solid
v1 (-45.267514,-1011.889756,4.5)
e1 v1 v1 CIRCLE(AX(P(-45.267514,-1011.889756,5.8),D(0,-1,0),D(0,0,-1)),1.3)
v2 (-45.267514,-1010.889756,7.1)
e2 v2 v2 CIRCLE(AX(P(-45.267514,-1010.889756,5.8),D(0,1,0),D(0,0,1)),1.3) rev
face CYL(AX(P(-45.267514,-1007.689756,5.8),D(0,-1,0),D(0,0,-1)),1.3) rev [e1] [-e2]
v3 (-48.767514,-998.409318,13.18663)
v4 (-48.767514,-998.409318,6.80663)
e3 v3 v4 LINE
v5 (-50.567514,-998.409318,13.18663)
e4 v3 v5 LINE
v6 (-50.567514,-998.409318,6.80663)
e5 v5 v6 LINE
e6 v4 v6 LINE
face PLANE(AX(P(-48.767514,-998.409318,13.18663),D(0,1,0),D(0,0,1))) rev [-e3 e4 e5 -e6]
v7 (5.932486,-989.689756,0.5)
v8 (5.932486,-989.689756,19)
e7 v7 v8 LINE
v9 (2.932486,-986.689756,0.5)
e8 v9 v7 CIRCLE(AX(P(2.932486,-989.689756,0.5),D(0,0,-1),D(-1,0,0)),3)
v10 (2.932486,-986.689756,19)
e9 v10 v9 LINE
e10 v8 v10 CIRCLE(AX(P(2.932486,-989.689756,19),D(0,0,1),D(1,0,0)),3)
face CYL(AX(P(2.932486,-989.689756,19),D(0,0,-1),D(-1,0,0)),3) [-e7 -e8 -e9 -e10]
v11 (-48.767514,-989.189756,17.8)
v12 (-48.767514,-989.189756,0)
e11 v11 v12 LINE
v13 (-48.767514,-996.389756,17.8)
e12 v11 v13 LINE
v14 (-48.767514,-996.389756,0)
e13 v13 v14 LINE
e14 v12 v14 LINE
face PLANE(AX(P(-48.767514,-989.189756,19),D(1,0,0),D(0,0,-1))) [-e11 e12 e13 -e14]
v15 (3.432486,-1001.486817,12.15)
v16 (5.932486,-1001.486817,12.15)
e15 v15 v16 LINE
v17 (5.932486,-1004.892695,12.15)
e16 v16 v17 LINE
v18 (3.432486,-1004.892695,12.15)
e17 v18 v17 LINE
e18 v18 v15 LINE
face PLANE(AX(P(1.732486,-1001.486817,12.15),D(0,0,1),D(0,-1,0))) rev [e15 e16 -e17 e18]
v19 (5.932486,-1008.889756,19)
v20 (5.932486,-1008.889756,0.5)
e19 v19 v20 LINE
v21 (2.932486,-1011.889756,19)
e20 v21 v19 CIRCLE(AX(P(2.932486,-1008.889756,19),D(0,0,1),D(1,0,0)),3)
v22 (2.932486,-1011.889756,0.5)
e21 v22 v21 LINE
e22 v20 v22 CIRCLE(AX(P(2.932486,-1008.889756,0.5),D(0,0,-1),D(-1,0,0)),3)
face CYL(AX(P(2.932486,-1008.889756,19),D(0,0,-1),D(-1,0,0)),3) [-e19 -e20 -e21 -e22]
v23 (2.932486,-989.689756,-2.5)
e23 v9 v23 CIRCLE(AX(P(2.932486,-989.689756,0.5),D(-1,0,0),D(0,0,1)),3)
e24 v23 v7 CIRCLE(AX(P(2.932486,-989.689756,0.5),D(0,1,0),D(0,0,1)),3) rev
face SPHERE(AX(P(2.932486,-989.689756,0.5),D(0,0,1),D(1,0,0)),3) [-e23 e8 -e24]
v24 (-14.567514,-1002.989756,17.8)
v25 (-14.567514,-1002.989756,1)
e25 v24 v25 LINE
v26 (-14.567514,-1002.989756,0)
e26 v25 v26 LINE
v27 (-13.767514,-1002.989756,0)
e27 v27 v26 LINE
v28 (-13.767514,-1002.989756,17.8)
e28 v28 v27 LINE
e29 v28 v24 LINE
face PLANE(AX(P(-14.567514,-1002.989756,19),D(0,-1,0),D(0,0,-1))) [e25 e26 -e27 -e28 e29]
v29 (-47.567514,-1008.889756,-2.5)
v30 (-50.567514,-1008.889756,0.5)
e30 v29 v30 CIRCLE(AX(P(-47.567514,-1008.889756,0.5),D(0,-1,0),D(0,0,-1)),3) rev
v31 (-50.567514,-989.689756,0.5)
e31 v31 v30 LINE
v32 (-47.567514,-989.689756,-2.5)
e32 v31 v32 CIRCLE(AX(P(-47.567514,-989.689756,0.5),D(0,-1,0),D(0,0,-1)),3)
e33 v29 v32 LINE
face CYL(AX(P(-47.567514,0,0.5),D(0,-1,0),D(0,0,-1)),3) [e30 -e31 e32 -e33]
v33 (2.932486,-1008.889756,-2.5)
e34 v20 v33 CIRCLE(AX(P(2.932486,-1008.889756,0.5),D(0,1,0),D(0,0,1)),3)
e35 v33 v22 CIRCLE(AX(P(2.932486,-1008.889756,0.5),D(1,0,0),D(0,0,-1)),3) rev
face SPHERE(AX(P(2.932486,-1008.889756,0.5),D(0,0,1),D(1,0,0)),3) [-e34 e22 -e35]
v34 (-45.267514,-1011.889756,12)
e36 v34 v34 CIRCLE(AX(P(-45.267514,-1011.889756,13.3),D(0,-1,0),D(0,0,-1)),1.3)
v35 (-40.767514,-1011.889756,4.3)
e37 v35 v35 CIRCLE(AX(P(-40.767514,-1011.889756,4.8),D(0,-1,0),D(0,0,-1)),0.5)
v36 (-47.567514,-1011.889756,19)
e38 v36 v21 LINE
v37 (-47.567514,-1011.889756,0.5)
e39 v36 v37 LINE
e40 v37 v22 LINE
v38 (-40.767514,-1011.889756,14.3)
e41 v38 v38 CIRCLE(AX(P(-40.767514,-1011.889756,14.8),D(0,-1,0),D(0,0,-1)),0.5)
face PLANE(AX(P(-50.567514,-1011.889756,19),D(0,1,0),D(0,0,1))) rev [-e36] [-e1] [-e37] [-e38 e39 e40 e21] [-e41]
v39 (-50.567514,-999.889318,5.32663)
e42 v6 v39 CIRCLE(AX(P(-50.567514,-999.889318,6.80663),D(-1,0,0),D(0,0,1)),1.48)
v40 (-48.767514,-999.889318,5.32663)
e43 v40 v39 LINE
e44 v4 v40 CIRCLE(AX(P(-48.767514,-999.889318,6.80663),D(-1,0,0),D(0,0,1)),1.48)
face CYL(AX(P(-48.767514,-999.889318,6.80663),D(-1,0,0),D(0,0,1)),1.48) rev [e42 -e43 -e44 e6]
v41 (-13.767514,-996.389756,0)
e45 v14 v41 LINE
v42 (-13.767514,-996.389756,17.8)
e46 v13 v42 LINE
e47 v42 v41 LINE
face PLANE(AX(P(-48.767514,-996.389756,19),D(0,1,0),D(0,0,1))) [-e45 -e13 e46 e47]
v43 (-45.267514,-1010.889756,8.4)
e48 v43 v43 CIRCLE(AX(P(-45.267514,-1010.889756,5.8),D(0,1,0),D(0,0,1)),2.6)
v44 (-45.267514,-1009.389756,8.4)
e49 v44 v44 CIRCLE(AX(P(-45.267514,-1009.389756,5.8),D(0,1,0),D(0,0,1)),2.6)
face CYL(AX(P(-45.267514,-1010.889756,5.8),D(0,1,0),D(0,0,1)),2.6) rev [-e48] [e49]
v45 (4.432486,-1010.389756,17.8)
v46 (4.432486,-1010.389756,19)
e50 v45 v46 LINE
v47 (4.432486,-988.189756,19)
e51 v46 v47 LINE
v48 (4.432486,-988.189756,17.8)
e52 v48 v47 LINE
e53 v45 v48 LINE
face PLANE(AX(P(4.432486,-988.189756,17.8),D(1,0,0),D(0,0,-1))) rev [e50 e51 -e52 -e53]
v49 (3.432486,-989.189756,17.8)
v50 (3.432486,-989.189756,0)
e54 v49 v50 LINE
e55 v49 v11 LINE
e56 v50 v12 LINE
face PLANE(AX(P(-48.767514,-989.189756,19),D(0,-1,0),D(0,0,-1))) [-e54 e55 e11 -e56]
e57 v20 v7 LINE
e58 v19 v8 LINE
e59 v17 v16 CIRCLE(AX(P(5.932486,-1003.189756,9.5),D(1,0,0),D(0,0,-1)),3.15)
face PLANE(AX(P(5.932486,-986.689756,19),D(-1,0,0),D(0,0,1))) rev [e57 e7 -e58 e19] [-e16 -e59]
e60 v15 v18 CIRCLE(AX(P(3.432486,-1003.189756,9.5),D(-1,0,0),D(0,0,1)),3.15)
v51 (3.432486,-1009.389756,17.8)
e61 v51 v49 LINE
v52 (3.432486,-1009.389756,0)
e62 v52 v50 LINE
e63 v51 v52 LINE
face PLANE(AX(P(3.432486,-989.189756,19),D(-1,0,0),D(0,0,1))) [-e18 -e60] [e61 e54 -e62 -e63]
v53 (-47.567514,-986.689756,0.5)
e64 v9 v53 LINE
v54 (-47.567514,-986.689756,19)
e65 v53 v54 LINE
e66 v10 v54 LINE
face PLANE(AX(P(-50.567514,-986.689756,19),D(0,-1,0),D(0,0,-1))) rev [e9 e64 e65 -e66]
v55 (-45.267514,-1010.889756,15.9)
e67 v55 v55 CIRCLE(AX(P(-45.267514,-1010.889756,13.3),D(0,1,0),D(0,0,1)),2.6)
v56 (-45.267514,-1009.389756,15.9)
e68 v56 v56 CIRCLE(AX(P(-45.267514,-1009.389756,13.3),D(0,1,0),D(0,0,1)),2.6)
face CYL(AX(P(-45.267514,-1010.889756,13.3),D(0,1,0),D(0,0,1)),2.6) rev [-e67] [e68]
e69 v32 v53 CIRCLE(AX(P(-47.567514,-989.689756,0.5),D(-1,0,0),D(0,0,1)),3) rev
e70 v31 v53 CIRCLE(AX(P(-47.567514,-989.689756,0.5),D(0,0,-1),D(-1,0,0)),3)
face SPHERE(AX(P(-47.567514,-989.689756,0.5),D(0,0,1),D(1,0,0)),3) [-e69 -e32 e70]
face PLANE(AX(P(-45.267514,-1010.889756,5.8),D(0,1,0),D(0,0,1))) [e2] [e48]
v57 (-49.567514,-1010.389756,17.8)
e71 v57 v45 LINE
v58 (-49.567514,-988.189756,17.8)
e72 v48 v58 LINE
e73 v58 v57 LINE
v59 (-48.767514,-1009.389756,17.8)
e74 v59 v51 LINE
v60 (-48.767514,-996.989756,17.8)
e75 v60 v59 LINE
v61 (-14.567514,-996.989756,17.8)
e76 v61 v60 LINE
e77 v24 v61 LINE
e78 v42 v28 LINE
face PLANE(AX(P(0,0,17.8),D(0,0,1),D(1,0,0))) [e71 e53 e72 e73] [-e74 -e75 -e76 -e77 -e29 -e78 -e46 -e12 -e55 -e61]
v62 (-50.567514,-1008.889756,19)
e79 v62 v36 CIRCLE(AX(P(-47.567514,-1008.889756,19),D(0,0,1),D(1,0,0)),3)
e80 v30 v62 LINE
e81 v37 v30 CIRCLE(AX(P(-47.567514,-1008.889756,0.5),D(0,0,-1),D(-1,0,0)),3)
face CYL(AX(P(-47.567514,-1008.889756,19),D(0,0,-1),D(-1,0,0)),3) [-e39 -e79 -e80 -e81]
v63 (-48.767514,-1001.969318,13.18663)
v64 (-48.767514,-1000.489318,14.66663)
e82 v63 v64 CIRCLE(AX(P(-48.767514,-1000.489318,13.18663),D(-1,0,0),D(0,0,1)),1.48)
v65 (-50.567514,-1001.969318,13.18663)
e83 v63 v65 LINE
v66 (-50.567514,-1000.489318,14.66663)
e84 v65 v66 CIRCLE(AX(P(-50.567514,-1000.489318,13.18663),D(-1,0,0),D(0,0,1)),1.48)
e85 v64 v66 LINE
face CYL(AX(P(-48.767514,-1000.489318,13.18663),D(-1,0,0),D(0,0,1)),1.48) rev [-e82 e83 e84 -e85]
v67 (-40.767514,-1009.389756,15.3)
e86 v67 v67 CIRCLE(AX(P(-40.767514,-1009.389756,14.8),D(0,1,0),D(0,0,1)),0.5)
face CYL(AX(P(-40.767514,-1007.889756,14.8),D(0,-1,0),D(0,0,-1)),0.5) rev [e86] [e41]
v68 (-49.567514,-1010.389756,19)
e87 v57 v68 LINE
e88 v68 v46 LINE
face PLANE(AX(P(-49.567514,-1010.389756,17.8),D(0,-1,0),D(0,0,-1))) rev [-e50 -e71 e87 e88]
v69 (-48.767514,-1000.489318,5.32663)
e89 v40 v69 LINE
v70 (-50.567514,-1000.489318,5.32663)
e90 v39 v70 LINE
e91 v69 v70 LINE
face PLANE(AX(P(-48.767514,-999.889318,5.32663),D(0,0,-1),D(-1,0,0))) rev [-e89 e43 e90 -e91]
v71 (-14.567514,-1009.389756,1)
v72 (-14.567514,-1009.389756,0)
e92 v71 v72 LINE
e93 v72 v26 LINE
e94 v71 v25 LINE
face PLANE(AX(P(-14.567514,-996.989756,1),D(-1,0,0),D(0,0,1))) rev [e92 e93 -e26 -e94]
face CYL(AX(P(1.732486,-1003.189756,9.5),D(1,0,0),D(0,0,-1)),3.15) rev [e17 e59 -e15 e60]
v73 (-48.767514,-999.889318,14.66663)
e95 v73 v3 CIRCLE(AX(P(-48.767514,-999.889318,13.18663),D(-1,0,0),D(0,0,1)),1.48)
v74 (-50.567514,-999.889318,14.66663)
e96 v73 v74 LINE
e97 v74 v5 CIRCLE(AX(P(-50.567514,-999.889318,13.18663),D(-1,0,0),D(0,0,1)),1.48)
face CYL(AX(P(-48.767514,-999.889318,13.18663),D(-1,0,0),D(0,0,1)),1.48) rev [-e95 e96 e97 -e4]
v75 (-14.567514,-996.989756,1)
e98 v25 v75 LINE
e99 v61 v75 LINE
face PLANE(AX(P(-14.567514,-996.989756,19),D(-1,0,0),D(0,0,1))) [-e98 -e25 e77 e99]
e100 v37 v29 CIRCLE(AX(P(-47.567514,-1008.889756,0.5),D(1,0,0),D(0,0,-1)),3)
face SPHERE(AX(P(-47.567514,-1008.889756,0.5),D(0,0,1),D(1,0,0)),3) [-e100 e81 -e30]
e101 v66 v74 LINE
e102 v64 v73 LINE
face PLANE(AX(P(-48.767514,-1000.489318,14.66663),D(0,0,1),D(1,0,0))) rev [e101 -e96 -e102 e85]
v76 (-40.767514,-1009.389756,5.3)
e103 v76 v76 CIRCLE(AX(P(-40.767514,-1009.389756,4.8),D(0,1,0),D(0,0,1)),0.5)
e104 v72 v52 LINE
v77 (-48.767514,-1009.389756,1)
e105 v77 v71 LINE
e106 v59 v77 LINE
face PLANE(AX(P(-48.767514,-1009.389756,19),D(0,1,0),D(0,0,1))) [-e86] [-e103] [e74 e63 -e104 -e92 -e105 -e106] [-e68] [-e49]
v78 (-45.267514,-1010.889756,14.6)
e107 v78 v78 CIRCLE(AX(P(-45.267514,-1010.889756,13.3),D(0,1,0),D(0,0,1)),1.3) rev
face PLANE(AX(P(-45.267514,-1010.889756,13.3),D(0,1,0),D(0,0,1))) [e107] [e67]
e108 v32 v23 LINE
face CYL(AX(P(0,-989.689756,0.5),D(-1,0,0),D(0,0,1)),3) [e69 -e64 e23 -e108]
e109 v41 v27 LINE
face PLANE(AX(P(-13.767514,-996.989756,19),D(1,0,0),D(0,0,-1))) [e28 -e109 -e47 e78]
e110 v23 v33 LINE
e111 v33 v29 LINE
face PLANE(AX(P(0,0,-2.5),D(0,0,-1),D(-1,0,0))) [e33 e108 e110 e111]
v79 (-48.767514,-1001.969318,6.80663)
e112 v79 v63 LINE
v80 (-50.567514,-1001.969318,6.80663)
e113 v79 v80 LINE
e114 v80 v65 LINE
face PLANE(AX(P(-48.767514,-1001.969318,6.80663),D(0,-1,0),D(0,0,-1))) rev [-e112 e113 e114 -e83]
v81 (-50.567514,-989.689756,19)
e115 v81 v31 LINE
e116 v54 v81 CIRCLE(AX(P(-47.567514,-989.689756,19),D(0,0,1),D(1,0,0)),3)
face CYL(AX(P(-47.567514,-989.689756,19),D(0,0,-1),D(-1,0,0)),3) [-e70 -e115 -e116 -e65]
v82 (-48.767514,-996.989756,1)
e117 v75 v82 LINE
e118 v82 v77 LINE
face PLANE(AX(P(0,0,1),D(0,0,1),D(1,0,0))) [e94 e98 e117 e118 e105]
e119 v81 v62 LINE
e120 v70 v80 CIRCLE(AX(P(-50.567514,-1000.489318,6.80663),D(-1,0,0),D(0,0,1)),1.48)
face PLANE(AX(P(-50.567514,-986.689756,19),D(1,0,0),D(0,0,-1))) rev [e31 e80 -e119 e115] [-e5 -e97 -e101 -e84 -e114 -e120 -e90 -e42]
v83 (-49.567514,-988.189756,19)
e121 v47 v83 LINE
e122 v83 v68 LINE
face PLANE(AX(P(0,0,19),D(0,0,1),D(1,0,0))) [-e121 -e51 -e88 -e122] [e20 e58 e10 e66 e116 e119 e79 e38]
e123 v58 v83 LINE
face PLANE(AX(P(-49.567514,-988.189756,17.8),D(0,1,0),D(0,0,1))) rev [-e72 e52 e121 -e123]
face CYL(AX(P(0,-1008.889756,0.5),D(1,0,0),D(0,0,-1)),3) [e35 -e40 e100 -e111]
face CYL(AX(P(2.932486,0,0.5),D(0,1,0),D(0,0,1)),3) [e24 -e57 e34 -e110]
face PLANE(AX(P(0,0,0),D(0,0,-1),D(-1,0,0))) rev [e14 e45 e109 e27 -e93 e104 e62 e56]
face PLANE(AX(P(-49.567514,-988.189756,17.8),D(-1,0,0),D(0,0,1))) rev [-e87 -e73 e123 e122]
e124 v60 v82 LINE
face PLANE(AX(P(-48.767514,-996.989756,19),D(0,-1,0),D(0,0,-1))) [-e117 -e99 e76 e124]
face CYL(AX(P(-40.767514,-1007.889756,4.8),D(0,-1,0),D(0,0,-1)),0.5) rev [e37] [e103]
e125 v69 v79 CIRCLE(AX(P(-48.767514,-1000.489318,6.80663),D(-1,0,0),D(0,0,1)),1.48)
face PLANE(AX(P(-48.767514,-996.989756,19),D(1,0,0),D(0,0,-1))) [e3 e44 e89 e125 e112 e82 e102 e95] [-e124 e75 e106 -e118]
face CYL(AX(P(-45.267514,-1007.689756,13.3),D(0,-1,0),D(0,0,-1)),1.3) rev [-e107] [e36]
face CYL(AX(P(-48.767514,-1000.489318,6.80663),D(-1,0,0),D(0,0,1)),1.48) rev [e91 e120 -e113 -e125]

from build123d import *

# Parameters (mm, degrees)
SKETCH_1_W          = 56.5
SKETCH_1_H          = 25.2
EXTRUDE_1_DEPTH     = 19
SKETCH_2_W          = 56.5
SKETCH_2_H          = 25.2
EXTRUDE_2_DEPTH     = 2.5
SKETCH_3_W          = 34.2
SKETCH_3_H          = 12.4
EXTRUDE_3_DEPTH     = 1
CUT_EXTRUDE_1_DEPTH = 1.8
SKETCH_5_W          = 54
SKETCH_5_H          = 22.2
CUT_EXTRUDE_2_DEPTH = 1.2
CUT_EXTRUDE_3_DEPTH = 4.2
FILLET_1_R          = 3
FILLET_2_R          = 3
SKETCH_8_R          = 1.3
CUT_EXTRUDE_4_DEPTH = 4.2
SKETCH_9_R          = 2.6
CUT_EXTRUDE_5_DEPTH = 1.5
SKETCH_10_R         = 0.5
CUT_EXTRUDE_6_DEPTH = 4


with BuildPart() as part:
    # Эскиз1 → Бобышка-Вытянуть1 (new body)
    with BuildSketch(Plane.XY):
        with Locations((-22.317513824, -999.289755901)):
            Rectangle(SKETCH_1_W, SKETCH_1_H)
        Polygon((-48.767513824, -989.189755901), (3.432486176, -989.189755901), (3.432486176, -1009.389755901), (-48.767513824, -1009.389755901), (-48.767513824, -996.989755901), (-14.567513824, -996.989755901), (-14.567513824, -1002.989755901), (-13.767513824, -1002.989755901), (-13.767513824, -996.989755901), (-13.767513824, -996.389755901), (-48.767513824, -996.389755901), align=None, mode=Mode.SUBTRACT)
    extrude(amount=EXTRUDE_1_DEPTH)

    # Эскиз2 → Бобышка-Вытянуть2 (add)
    with BuildSketch(Plane(origin=(0, 0, 0), x_dir=(-1, 0, 0), z_dir=(0, 0, -1))):
        with Locations((22.317513824, -999.289755901)):
            Rectangle(SKETCH_2_W, SKETCH_2_H)
    extrude(amount=EXTRUDE_2_DEPTH)

    # Эскиз3 → Бобышка-Вытянуть3 (add)
    with BuildSketch(Plane.XY):
        with Locations((-31.667513824, -1003.189755901)):
            Rectangle(SKETCH_3_W, SKETCH_3_H)
    extrude(amount=EXTRUDE_3_DEPTH)

    # Эскиз4 → Вырез-Вытянуть1 (cut)
    with BuildSketch(Plane.ZY.offset(50.567513824)):
        with BuildLine():
            Line((14.666630398, -1000.489317936), (14.666630398, -999.889317936))
            ThreePointArc((14.666630398, -999.889317936), (14.233148434, -998.8427999), (13.186630398, -998.409317936))
            Line((13.186630398, -998.409317936), (6.806630398, -998.409317936))
            ThreePointArc((6.806630398, -998.409317936), (5.760112362, -998.8427999), (5.326630398, -999.889317936))
            Line((5.326630398, -999.889317936), (5.326630398, -1000.489317936))
            ThreePointArc((5.326630398, -1000.489317936), (5.760112362, -1001.535835972), (6.806630398, -1001.969317936))
            Line((6.806630398, -1001.969317936), (13.186630398, -1001.969317936))
            ThreePointArc((13.186630398, -1001.969317936), (14.233148434, -1001.535835972), (14.666630398, -1000.489317936))
        make_face()
    extrude(amount=-CUT_EXTRUDE_1_DEPTH, mode=Mode.SUBTRACT)

    # Эскиз5 → Вырез-Вытянуть2 (cut)
    with BuildSketch(Plane.XY.offset(19)):
        with Locations((-22.567513824, -999.289755901)):
            Rectangle(SKETCH_5_W, SKETCH_5_H)
    extrude(amount=-CUT_EXTRUDE_2_DEPTH, mode=Mode.SUBTRACT)

    # Эскиз7 → Вырез-Вытянуть3 (cut)
    with BuildSketch(Plane(origin=(5.932486176, 0, 0), x_dir=(0, 0, -1), z_dir=(1, 0, 0))):
        with BuildLine():
            Line((-12.15, -1001.486817264), (-12.15, -1004.892694537))
            ThreePointArc((-12.15, -1004.892694537), (-6.35, -1003.189755901), (-12.15, -1001.486817264))
        make_face()
    extrude(amount=-CUT_EXTRUDE_3_DEPTH, mode=Mode.SUBTRACT)

    # Скругление1
    fillet_1_edges = [part.edges().sort_by_distance(p)[0] for p in [
        (5.932486176, -999.289755901, -2.5),
        (-22.317513824, -1011.889755901, -2.5),
        (-50.567513824, -999.289755901, -2.5),
        (-22.317513824, -986.689755901, -2.5),
    ]]
    fillet(fillet_1_edges, radius=FILLET_1_R)

    # Скругление2
    # the kernel refuses this fillet: 3 mm, written as the material it takes off along each edge
    with BuildSketch(Plane(origin=(-47.567513824, -1008.889755901, 0.5), x_dir=(0, -1, 0), z_dir=(-1, 0, 0))) as fillet_2_piece_1_section:
        Polygon((0, 0), (FILLET_2_R, 0), (FILLET_2_R, -FILLET_2_R), (0, -FILLET_2_R), align=None)
    fillet_2_piece_1 = extrude(amount=FILLET_2_R, mode=Mode.PRIVATE)
    fillet_2_piece_1 = fillet_2_piece_1 - Plane(origin=(-47.567513824, -1008.889755901, 0.5), x_dir=(0, 0.7071067811865475, 0.7071067811865475), z_dir=(-1, 0, 0)) * Sphere(FILLET_2_R, mode=Mode.PRIVATE)
    add(fillet_2_piece_1, mode=Mode.SUBTRACT)
    with BuildSketch(Plane(origin=(2.932486176, -1008.889755901, 0.5), x_dir=(0, -1, 0), z_dir=(1, 0, 0))) as fillet_2_piece_2_section:
        Polygon((0, 0), (FILLET_2_R, 0), (FILLET_2_R, FILLET_2_R), (0, FILLET_2_R), align=None)
    fillet_2_piece_2 = extrude(amount=FILLET_2_R, mode=Mode.PRIVATE)
    fillet_2_piece_2 = fillet_2_piece_2 - Plane(origin=(2.932486176, -1008.889755901, 0.5), x_dir=(0, 0.7071067811865475, 0.7071067811865475), z_dir=(1, 0, 0)) * Sphere(FILLET_2_R, mode=Mode.PRIVATE)
    add(fillet_2_piece_2, mode=Mode.SUBTRACT)
    with BuildSketch(Plane(origin=(-47.567513824, -989.689755901, 0.5), x_dir=(-1, 0, 0), z_dir=(0, 1, 0))) as fillet_2_piece_3_section:
        Polygon((0, 0), (FILLET_2_R, 0), (FILLET_2_R, -FILLET_2_R), (0, -FILLET_2_R), align=None)
    fillet_2_piece_3 = extrude(amount=FILLET_2_R, mode=Mode.PRIVATE)
    fillet_2_piece_3 = fillet_2_piece_3 - Plane(origin=(-47.567513824, -989.689755901, 0.5), x_dir=(0.7071067811865475, 0, 0.7071067811865475), z_dir=(0, 1, 0)) * Sphere(FILLET_2_R, mode=Mode.PRIVATE)
    add(fillet_2_piece_3, mode=Mode.SUBTRACT)
    with BuildSketch(Plane(origin=(2.932486176, -989.689755901, 0.5), x_dir=(1, 0, 0), z_dir=(0, 1, 0))) as fillet_2_piece_4_section:
        Polygon((0, 0), (FILLET_2_R, 0), (FILLET_2_R, FILLET_2_R), (0, FILLET_2_R), align=None)
    fillet_2_piece_4 = extrude(amount=FILLET_2_R, mode=Mode.PRIVATE)
    fillet_2_piece_4 = fillet_2_piece_4 - Plane(origin=(2.932486176, -989.689755901, 0.5), x_dir=(-0.7071067811865475, 0, 0.7071067811865475), z_dir=(0, 1, 0)) * Sphere(FILLET_2_R, mode=Mode.PRIVATE)
    add(fillet_2_piece_4, mode=Mode.SUBTRACT)
    with BuildSketch(Plane(origin=(-50.567513824, -986.689755901, 0.5), x_dir=(1, 0, 0), z_dir=(0, 0, 1)), Plane(origin=(5.932486176, -986.689755901, 26.5), x_dir=(-1, 0, 0), z_dir=(0, 0, -1)), Plane(origin=(5.932486176, -1011.889755901, 26.5), x_dir=(0, 1, 0), z_dir=(0, 0, -1)), Plane(origin=(-50.567513824, -1011.889755901, 0.5), x_dir=(0, 1, 0), z_dir=(0, 0, 1))) as fillet_2_piece_5:
        with BuildLine():
            CenterArc((FILLET_2_R, -FILLET_2_R), FILLET_2_R, 90, 90)
            Line((0, -FILLET_2_R), (0, 0))
            Line((0, 0), (FILLET_2_R, 0))
        make_face()
    extrude(amount=26, mode=Mode.SUBTRACT)

    # Эскиз8 → Вырез-Вытянуть4 (cut)
    with BuildSketch(Plane.XZ.offset(1011.889755901)):
        with Locations(Location((-45.267513824, 5.8, 0), (0, 0, 270))):
            Circle(SKETCH_8_R)
        with Locations(Location((-45.267513824, 13.3, 0), (0, 0, 270))):
            Circle(SKETCH_8_R)
    extrude(amount=-CUT_EXTRUDE_4_DEPTH, mode=Mode.SUBTRACT)

    # Эскиз9 → Вырез-Вытянуть5 (cut)
    with BuildSketch(Plane(origin=(0, -1009.389755901, 0), x_dir=(1, 0, 0), z_dir=(0, 1, 0))):
        with Locations(Location((-45.267513824, -5.8, 0), (0, 0, 270))):
            Circle(SKETCH_9_R)
        with Locations(Location((-45.267513824, -13.3, 0), (0, 0, 270))):
            Circle(SKETCH_9_R)
    extrude(amount=-CUT_EXTRUDE_5_DEPTH, mode=Mode.SUBTRACT)

    # Эскиз10 → Вырез-Вытянуть6 (cut)
    with BuildSketch(Plane.XZ.offset(1011.889755901)):
        with Locations(Location((-40.767513824, 4.8, 0), (0, 0, 270))):
            Circle(SKETCH_10_R)
        with Locations(Location((-40.767513824, 14.8, 0), (0, 0, 270))):
            Circle(SKETCH_10_R)
    extrude(amount=-CUT_EXTRUDE_6_DEPTH, mode=Mode.SUBTRACT)


solid = part.part
